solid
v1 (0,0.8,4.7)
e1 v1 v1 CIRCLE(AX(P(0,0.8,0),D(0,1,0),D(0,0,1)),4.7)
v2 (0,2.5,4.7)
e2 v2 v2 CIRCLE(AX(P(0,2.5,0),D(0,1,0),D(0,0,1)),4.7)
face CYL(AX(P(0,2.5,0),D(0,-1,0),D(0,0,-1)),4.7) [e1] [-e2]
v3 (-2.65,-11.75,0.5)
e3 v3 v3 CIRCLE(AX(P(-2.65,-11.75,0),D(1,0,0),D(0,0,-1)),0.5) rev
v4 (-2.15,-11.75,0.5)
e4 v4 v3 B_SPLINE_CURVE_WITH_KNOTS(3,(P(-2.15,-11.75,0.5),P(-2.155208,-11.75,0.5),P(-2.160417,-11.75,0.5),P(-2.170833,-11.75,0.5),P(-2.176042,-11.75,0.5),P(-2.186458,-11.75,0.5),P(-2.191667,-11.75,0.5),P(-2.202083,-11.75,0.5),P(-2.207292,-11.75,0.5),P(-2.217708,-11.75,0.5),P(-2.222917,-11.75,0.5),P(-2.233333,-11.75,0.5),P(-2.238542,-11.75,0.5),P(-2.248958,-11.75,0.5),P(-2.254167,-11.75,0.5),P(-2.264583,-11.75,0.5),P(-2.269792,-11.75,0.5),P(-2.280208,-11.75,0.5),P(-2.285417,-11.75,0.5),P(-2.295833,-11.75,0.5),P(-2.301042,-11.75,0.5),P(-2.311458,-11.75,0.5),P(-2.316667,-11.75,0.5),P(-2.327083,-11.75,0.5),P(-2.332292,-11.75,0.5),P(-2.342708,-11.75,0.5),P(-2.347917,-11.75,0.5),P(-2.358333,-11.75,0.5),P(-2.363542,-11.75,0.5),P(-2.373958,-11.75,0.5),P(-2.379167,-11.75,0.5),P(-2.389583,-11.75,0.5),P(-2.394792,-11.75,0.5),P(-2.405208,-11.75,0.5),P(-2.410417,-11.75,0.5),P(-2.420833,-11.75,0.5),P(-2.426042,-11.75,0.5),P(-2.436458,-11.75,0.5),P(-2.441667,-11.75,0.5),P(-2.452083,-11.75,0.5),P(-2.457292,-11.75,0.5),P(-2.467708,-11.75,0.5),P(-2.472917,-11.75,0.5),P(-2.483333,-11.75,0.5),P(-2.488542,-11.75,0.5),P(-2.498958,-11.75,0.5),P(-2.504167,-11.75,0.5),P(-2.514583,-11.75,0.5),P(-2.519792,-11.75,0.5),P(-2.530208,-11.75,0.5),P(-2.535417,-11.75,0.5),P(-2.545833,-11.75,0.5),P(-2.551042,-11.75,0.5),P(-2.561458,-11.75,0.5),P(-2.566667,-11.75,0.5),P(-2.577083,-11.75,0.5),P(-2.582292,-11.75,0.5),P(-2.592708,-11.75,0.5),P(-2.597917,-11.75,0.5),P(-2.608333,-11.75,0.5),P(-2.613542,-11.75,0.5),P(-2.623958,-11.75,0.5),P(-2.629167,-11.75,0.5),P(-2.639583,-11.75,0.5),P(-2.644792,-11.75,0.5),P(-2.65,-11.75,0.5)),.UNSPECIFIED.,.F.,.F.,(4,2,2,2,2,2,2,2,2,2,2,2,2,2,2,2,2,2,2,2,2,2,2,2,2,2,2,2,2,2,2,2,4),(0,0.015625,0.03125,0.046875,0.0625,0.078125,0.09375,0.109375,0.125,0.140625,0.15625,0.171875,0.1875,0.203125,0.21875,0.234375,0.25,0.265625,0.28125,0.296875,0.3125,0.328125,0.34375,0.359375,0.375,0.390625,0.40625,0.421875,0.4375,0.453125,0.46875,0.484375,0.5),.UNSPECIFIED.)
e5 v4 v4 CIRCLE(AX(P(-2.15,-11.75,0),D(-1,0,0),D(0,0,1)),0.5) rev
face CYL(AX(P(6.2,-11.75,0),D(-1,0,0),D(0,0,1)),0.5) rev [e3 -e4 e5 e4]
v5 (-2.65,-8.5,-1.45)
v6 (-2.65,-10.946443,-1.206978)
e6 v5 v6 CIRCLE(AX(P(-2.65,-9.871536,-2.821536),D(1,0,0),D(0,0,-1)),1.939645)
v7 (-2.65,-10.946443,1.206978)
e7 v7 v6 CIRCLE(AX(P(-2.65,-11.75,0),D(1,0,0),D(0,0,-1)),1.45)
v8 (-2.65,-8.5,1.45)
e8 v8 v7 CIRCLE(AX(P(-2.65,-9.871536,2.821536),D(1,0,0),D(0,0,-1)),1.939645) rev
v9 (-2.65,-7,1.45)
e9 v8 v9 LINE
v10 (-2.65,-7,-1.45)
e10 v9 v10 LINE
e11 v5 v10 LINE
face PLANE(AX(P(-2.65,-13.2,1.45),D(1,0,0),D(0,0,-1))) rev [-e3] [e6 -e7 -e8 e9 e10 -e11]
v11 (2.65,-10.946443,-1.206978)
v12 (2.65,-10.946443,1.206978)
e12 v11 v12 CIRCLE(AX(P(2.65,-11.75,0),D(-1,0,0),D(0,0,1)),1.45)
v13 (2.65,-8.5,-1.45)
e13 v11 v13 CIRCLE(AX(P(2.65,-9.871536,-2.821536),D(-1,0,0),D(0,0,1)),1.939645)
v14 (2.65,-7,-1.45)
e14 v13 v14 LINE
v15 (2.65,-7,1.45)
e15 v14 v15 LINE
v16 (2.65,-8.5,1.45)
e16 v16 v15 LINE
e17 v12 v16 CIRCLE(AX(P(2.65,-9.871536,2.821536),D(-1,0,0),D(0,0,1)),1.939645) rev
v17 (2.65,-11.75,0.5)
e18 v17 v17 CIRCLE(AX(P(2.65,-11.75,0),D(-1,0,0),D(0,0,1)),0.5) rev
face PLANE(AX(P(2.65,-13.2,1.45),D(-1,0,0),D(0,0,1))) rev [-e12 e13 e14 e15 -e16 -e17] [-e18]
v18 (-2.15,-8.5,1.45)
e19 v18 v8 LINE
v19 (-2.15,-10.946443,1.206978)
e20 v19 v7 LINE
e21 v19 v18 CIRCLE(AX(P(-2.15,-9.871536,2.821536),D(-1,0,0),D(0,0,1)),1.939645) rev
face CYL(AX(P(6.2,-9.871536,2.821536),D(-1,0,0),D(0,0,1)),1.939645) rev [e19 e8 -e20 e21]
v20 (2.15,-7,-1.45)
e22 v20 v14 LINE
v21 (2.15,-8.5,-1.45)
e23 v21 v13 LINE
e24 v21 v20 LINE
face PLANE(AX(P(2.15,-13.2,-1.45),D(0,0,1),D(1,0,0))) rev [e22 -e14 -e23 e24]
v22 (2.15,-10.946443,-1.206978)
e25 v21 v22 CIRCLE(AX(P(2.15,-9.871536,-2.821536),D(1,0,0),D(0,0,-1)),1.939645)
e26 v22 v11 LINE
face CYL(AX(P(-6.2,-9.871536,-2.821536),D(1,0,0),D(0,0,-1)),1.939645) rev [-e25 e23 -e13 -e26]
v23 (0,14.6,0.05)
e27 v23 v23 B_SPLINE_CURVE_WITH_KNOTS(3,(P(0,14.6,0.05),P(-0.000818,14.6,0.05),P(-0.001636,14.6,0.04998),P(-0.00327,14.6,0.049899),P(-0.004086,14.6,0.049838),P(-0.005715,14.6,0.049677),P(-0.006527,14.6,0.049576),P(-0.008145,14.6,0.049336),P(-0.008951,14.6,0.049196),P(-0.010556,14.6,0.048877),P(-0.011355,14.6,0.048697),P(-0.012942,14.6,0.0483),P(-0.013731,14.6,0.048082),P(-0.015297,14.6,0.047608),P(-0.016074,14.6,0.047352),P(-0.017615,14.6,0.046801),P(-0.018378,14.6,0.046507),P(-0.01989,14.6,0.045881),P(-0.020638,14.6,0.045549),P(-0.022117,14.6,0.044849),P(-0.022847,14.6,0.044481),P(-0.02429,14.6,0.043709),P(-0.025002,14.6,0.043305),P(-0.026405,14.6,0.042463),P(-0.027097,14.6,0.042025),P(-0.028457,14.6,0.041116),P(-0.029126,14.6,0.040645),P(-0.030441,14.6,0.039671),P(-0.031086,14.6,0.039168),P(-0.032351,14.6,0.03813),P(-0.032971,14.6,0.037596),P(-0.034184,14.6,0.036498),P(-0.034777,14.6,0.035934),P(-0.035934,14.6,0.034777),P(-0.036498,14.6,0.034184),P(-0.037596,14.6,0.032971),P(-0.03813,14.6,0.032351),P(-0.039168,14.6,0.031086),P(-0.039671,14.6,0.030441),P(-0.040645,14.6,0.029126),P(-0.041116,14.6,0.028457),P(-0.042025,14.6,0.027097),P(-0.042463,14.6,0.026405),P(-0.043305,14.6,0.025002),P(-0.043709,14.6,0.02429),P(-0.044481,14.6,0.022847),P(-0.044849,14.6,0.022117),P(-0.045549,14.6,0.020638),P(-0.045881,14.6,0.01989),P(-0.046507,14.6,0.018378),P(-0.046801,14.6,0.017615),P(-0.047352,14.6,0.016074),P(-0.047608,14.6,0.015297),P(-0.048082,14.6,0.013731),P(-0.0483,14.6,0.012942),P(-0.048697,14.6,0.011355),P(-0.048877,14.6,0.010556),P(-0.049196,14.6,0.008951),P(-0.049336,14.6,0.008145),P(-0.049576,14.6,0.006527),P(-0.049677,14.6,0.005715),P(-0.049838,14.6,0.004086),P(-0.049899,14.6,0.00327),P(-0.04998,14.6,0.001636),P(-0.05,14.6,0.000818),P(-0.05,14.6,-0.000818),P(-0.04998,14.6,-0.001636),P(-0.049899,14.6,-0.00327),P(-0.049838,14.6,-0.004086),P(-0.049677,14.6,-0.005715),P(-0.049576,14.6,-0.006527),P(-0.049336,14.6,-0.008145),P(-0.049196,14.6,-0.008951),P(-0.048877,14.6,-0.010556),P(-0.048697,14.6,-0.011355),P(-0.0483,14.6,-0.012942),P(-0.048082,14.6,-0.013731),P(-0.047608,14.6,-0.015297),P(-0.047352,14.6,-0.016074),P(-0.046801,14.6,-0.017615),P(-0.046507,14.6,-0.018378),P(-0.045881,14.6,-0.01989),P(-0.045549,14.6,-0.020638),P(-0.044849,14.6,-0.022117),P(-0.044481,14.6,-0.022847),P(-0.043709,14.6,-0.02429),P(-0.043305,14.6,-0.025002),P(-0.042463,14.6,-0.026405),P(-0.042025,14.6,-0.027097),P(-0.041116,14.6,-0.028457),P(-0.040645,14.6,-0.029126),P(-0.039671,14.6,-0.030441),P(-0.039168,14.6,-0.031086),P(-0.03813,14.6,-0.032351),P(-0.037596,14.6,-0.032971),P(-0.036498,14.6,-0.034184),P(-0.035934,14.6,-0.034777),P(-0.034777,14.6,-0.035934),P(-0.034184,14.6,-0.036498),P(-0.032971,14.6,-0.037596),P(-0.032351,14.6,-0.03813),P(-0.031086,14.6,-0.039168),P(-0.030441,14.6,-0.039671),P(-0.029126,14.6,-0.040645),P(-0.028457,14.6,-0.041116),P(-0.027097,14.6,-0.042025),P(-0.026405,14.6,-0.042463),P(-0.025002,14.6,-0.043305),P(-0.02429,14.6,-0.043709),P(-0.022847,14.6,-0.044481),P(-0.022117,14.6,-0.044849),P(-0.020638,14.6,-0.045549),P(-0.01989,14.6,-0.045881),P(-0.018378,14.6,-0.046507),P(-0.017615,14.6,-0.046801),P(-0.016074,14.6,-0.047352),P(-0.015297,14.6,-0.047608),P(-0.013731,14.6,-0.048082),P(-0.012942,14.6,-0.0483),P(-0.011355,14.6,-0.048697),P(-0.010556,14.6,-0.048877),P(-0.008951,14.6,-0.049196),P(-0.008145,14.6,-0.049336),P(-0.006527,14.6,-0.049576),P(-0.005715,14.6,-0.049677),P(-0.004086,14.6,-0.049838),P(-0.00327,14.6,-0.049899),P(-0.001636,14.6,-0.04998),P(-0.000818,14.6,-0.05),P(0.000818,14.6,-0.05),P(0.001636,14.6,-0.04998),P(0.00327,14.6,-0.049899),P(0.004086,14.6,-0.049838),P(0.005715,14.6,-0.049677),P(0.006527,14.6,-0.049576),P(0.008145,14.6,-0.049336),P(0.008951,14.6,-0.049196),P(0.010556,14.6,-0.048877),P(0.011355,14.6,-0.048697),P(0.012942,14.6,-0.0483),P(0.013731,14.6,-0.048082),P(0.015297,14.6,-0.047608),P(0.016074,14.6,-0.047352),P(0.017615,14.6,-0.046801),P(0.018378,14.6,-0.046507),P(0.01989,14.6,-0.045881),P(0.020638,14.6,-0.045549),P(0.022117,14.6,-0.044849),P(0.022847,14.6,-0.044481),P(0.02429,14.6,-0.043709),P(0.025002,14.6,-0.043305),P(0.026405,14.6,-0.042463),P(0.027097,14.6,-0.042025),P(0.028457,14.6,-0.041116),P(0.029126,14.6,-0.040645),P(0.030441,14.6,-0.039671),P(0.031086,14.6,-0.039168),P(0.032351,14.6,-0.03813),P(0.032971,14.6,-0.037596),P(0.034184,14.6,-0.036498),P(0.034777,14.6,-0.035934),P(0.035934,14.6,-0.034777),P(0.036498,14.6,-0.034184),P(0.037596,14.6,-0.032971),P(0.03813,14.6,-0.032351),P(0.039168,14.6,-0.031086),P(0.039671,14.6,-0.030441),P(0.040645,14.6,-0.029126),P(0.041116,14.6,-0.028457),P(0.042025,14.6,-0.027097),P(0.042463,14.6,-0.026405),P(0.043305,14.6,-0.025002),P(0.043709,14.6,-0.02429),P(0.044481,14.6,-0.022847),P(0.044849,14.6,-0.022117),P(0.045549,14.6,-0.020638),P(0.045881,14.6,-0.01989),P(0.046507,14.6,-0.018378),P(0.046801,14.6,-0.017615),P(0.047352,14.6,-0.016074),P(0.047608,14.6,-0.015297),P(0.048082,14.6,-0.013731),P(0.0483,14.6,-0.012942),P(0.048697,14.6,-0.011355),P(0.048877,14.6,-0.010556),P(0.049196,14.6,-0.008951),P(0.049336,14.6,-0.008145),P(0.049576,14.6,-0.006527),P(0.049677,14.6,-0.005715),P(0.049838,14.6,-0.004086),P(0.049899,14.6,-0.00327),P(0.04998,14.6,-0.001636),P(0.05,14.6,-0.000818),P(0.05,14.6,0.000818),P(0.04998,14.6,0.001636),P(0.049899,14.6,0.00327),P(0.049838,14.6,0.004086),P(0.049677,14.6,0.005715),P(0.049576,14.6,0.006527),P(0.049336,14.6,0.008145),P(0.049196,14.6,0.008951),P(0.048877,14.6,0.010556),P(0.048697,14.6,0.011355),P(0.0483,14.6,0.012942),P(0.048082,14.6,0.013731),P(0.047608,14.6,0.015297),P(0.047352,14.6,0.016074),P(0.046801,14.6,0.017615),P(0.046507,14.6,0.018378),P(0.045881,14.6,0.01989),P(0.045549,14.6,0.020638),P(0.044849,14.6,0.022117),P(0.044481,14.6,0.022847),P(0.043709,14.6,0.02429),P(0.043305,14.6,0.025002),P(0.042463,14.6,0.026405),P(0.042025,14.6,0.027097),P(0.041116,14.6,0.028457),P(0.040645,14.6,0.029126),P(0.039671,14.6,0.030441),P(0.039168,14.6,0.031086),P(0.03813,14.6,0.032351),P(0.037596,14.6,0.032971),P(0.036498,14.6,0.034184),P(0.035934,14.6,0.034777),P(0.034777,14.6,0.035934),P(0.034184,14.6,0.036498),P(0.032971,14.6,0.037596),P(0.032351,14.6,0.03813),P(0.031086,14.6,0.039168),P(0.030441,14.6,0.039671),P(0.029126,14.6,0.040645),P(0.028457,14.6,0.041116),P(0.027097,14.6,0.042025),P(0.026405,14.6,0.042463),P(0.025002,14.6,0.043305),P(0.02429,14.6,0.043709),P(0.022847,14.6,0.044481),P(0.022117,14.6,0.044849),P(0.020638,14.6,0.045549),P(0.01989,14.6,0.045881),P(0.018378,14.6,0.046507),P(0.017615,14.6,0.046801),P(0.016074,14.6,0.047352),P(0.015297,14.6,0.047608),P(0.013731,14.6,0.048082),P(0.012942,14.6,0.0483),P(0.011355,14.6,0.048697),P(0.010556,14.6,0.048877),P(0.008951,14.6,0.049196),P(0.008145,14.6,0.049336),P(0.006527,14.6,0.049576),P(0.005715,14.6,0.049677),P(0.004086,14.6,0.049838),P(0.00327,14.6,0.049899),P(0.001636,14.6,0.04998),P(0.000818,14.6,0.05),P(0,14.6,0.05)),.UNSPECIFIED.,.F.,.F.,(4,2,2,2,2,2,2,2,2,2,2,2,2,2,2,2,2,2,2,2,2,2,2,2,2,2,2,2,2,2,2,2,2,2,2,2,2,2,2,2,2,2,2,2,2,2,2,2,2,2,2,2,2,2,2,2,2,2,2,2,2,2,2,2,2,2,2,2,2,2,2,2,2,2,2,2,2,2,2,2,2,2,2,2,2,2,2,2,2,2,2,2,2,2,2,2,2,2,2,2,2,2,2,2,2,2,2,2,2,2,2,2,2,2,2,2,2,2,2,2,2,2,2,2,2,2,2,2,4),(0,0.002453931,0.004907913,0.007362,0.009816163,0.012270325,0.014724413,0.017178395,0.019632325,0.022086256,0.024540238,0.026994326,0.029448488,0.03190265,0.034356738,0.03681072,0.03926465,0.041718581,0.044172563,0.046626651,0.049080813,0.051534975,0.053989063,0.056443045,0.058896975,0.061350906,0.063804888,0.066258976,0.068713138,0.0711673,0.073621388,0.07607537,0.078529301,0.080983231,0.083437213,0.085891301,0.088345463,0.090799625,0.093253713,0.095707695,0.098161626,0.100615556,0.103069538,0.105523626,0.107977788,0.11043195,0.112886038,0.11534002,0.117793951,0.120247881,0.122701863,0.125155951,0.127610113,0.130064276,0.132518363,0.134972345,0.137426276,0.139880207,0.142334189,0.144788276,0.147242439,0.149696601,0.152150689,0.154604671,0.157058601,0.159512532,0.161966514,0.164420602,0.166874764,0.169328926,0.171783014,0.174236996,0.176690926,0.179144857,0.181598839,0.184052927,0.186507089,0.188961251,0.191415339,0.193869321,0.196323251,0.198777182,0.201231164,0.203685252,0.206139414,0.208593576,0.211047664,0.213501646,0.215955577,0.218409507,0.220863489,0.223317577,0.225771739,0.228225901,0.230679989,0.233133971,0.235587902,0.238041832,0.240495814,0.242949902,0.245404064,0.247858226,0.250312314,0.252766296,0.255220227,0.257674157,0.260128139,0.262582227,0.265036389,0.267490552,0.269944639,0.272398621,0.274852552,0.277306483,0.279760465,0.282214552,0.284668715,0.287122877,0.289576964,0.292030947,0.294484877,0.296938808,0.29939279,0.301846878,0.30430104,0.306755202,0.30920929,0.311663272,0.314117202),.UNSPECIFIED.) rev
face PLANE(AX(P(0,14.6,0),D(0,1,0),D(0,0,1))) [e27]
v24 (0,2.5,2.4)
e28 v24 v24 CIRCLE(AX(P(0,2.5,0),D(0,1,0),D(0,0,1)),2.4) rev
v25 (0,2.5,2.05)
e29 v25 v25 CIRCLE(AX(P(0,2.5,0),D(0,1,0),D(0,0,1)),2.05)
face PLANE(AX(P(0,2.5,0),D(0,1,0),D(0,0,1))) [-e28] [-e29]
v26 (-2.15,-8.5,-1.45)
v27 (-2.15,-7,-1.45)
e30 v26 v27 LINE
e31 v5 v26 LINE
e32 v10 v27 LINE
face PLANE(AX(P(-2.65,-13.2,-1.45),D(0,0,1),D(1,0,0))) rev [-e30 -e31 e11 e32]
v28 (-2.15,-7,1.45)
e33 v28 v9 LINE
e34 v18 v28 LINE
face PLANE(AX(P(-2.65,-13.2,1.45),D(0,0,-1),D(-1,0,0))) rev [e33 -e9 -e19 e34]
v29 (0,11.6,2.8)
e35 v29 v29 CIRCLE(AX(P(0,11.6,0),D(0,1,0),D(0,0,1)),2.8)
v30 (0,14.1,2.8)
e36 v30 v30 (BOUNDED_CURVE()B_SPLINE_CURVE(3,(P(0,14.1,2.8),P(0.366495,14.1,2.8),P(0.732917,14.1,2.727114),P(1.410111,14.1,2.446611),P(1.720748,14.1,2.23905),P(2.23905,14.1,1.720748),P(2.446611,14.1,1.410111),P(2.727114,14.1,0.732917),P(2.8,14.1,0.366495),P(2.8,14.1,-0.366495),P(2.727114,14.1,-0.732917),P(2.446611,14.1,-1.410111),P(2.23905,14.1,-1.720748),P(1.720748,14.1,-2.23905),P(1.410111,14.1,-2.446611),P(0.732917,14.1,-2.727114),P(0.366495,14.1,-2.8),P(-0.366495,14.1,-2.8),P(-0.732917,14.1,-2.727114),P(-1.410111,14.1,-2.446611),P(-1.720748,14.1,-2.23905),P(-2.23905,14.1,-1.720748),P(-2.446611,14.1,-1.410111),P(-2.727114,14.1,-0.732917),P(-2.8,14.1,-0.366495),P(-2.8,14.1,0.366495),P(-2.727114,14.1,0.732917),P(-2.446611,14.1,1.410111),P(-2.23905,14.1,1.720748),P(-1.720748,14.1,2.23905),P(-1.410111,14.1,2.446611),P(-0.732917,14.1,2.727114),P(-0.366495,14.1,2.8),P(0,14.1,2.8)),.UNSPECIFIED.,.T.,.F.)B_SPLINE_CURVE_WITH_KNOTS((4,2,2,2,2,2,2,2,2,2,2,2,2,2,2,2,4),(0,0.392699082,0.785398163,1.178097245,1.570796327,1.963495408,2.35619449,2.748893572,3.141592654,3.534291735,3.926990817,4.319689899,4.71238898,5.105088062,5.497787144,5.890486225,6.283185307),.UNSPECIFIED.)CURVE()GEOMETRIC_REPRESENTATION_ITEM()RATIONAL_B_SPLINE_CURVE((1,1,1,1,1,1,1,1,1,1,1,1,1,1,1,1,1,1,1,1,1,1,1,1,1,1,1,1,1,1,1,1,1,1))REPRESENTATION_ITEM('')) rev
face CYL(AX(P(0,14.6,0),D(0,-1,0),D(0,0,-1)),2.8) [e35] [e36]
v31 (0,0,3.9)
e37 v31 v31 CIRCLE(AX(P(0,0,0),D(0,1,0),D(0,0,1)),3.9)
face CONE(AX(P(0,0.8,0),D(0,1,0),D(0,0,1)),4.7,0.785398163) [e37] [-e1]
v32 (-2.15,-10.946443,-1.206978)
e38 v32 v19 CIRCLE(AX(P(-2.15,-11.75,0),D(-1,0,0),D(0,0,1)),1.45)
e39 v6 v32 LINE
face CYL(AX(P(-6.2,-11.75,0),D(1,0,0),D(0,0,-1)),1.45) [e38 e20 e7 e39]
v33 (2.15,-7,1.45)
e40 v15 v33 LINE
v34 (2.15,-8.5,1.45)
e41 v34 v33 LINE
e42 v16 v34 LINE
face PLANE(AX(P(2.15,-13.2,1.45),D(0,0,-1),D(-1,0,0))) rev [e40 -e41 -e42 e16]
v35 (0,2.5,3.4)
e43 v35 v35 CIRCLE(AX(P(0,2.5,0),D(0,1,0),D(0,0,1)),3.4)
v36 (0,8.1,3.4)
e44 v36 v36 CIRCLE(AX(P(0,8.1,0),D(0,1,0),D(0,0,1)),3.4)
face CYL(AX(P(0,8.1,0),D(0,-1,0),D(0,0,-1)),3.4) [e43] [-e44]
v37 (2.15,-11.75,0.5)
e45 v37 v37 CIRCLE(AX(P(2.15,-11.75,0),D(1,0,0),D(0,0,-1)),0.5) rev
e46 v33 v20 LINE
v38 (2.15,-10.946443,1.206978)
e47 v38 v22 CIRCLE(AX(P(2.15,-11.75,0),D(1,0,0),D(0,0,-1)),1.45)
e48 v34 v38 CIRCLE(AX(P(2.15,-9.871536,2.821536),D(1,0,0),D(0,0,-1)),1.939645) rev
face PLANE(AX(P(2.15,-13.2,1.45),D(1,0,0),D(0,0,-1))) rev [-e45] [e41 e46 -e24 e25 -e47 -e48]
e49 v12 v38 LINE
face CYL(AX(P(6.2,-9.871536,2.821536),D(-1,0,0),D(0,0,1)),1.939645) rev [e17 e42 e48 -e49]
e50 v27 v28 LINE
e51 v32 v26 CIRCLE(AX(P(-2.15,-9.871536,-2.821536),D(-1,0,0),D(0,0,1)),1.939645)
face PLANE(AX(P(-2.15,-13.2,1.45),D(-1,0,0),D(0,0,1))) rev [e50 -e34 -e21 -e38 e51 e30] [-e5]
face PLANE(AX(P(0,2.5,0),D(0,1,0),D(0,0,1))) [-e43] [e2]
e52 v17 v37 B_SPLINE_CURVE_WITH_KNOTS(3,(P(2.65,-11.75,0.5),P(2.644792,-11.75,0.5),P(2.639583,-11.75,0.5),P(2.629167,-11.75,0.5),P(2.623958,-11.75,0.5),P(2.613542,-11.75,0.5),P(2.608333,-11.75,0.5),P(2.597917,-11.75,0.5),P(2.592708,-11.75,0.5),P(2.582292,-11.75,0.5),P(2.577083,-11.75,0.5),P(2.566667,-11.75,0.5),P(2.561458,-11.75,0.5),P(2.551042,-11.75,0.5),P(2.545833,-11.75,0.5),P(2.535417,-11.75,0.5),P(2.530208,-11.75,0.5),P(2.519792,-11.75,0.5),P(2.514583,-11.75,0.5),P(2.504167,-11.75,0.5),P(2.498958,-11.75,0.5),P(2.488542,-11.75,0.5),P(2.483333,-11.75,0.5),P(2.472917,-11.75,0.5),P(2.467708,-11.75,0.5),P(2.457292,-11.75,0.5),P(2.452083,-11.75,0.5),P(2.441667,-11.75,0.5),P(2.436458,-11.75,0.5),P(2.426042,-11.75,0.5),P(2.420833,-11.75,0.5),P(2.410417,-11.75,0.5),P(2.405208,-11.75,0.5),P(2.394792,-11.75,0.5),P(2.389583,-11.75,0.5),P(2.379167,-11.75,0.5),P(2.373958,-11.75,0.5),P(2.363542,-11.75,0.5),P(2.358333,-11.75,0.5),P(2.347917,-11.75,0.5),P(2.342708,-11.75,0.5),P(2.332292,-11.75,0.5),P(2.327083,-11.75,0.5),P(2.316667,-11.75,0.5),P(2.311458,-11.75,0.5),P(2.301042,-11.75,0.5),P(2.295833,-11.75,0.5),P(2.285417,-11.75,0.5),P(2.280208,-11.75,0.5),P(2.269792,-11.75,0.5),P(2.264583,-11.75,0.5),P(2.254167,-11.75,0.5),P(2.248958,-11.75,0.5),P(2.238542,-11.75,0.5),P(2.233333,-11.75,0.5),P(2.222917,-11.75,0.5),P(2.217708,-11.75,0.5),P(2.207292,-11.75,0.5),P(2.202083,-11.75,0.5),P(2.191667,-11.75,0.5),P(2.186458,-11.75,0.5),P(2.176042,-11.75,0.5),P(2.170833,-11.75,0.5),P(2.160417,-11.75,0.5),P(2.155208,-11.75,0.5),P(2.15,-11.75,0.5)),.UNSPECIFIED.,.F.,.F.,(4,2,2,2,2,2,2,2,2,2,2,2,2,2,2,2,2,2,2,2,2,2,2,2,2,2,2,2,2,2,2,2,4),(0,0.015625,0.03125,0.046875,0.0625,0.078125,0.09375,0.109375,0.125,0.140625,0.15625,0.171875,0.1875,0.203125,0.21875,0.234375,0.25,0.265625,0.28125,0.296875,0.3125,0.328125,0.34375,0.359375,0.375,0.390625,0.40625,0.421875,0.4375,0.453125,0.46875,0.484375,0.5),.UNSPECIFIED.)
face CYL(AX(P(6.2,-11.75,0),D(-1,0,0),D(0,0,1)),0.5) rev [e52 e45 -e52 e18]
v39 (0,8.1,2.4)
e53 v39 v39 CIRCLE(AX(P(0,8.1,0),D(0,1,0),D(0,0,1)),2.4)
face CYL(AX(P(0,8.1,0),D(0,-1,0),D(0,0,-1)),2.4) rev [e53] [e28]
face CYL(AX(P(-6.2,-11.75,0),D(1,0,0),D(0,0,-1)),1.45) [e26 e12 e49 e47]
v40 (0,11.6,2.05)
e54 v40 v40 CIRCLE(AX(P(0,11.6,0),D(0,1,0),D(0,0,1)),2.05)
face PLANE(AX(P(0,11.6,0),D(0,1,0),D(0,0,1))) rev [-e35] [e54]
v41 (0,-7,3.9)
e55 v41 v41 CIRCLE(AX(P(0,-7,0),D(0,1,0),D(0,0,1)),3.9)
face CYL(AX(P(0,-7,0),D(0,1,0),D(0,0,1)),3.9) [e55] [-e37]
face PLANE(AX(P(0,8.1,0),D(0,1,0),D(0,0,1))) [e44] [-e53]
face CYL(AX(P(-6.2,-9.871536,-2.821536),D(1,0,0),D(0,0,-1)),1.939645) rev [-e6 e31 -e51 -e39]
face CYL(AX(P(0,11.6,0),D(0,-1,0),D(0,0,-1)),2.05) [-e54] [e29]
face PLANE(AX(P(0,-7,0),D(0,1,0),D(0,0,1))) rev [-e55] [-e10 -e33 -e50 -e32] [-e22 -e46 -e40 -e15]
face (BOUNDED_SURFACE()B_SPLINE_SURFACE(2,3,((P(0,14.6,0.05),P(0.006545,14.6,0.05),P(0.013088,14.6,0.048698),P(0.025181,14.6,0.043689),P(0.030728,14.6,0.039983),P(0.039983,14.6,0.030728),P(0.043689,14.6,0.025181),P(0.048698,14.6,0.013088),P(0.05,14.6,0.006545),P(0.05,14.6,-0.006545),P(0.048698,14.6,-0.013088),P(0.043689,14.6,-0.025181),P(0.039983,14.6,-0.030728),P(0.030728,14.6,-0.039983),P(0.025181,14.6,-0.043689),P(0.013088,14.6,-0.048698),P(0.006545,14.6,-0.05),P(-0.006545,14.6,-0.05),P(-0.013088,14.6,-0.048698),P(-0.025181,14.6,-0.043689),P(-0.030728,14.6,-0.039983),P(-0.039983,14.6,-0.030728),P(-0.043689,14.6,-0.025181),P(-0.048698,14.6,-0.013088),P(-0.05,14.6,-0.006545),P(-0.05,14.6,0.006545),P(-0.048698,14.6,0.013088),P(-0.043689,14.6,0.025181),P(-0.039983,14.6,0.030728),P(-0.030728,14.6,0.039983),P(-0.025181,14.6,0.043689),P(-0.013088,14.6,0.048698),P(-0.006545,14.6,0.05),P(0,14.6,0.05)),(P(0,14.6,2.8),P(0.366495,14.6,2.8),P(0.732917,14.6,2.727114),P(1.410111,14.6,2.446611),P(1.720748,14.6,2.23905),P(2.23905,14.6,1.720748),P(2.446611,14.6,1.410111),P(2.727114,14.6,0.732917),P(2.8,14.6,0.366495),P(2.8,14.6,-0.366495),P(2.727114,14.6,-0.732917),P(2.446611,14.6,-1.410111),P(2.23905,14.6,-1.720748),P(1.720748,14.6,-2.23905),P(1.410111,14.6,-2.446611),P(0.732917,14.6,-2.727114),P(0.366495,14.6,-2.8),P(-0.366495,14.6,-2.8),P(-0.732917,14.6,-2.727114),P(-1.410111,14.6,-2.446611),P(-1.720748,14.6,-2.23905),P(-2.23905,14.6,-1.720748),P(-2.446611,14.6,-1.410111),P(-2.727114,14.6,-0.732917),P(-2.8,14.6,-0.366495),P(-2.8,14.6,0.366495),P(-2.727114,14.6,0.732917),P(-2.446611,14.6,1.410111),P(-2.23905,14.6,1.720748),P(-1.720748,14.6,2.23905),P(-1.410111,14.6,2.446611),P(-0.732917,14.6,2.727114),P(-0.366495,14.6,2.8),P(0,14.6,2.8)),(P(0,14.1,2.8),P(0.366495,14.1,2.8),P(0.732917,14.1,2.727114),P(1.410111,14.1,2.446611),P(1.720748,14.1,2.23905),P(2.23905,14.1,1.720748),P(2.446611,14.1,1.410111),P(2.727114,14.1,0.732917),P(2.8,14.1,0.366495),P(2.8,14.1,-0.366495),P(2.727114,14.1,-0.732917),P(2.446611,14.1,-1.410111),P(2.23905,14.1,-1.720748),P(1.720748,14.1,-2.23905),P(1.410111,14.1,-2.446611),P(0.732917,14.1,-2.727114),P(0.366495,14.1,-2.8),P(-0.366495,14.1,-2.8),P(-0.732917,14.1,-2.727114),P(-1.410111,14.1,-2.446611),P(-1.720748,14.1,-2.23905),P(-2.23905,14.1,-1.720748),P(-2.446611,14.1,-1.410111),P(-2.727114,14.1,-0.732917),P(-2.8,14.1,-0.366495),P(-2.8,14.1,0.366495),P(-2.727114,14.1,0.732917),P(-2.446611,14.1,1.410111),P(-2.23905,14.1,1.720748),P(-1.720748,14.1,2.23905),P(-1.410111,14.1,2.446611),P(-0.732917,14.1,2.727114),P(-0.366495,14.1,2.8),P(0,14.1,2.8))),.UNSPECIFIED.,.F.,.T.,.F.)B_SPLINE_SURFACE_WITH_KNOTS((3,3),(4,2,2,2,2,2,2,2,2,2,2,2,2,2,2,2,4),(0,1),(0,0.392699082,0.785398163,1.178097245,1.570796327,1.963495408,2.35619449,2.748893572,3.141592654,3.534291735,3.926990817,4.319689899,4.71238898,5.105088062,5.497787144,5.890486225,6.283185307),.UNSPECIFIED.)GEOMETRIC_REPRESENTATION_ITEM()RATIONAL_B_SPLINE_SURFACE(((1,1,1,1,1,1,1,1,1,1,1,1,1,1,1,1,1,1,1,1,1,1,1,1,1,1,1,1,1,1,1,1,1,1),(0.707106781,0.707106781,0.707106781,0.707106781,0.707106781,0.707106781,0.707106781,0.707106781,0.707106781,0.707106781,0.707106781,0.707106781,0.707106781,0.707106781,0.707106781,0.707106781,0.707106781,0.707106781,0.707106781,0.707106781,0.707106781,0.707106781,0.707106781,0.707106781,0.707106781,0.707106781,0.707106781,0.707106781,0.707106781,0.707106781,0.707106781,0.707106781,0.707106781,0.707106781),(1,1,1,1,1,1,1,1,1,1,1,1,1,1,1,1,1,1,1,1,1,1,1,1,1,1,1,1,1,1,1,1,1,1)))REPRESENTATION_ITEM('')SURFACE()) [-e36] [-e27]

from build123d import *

# Parameters (mm, degrees)
SKETCH1_R               = 3.9
BOSS_EXTRUDE1_DEPTH     = 7
SKETCH2_R               = 4.7
BOSS_EXTRUDE2_DEPTH     = 2.5
CHAMFER1_SIZE           = 0.8
SKETCH3_R               = 3.4
SKETCH3_R_2             = 2.4
BOSS_EXTRUDE3_DEPTH     = 5.6
SKETCH4_R               = 2.05
BOSS_EXTRUDE4_DEPTH     = 9.1
SKETCH5_R               = 2.8
BOSS_EXTRUDE5_DEPTH     = 3
FILLET1_SIZE            = 0.5
FILLET1_SIZE_2          = 2.75
SKETCH6_W               = 0.5
SKETCH6_H               = 2.9
BOSS_EXTRUDE6_DEPTH     = 6.2
CUT_EXTRUDE1_DEPTH      = 6.2
CUT_EXTRUDE1_DEPTH_BACK = 6.2
SKETCH7_R               = 0.5


# Some blends are built 0.0001 mm under size
with BuildPart() as part:
    # Sketch1 → Boss-Extrude1 (new body)
    with BuildSketch(Plane(origin=(0, 0, 0), x_dir=(1, 0, 0), z_dir=(0, 1, 0))):
        with Locations(Location((0, 0, 0), (0, 0, 270))):
            Circle(SKETCH1_R)
    extrude(amount=-BOSS_EXTRUDE1_DEPTH)

    # Sketch2 → Boss-Extrude2 (add)
    with BuildSketch(Plane(origin=(0, 0, 0), x_dir=(1, 0, 0), z_dir=(0, 1, 0))):
        with Locations(Location((0, 0, 0), (0, 0, 270))):
            Circle(SKETCH2_R)
    extrude(amount=BOSS_EXTRUDE2_DEPTH)

    # Chamfer1
    chamfer1_edges = [part.edges().sort_by_distance(p)[0] for p in [
        (0, 0, -4.7),
    ]]
    chamfer(chamfer1_edges, length=CHAMFER1_SIZE - 0.0001)  # a hair under: the kernel refuses the full size

    # Sketch3 → Boss-Extrude3 (add)
    with BuildSketch(Plane(origin=(0, 2.5, 0), x_dir=(1, 0, 0), z_dir=(0, 1, 0))):
        with Locations(Location((0, 0, 0), (0, 0, 270))):
            Circle(SKETCH3_R)
        with Locations(Location((0, 0, 0), (0, 0, 270))):
            Circle(SKETCH3_R_2, mode=Mode.SUBTRACT)
    extrude(amount=BOSS_EXTRUDE3_DEPTH)

    # Sketch4 → Boss-Extrude4 (add)
    with BuildSketch(Plane(origin=(0, 2.5, 0), x_dir=(1, 0, 0), z_dir=(0, 1, 0))):
        with Locations(Location((0, 0, 0), (0, 0, 270))):
            Circle(SKETCH4_R)
    extrude(amount=BOSS_EXTRUDE4_DEPTH)

    # Sketch5 → Boss-Extrude5 (add)
    with BuildSketch(Plane(origin=(0, 11.6, 0), x_dir=(1, 0, 0), z_dir=(0, 1, 0))):
        with Locations(Location((0, 0, 0), (0, 0, 270))):
            Circle(SKETCH5_R)
    extrude(amount=BOSS_EXTRUDE5_DEPTH)

    # Fillet1
    # an asymmetric fillet: 2.75, 0.5 mm, written as the material it takes off along each edge
    with BuildSketch(Plane(origin=(0, 14.6, 0), x_dir=(0, 0, 1), z_dir=(-1, 0, 0))) as fillet1_piece_1:
        with BuildLine():
            Bezier((2.8, -FILLET1_SIZE), (2.8, 0), (2.8 - FILLET1_SIZE_2, 0), weights=[1, 0.707106781, 1])
            Line((2.8 - FILLET1_SIZE_2, 0), (2.8, 0))
            Line((2.8, 0), (2.8, -FILLET1_SIZE))
        make_face()
    revolve(axis=Axis((0, 14.6, 0), (0, 1, 0)), mode=Mode.SUBTRACT)

    # Sketch6 → Boss-Extrude6 (add)
    with BuildSketch(Plane.XZ.offset(7)):
        with Locations((-2.4, 0)):
            Rectangle(SKETCH6_W, SKETCH6_H)
        with Locations((2.4, 0)):
            Rectangle(SKETCH6_W, SKETCH6_H)
    extrude(amount=BOSS_EXTRUDE6_DEPTH)

    # Sketch7 → Cut-Extrude1 (cut, two sides: drawn at the far end of the back side and taken through both)
    with BuildSketch(Plane(origin=(0, 0, 0), x_dir=(0, 0, -1), z_dir=(1, 0, 0)).offset(-CUT_EXTRUDE1_DEPTH_BACK)):
        with BuildLine():
            ThreePointArc((-1.206978138, -10.946443049), (-0.891390932, -9.679801587), (-1.45, -8.5))
            Line((-1.45, -8.5), (-1.45, -11.75))
            ThreePointArc((-1.45, -11.75), (-1.387915397, -11.330249062), (-1.206978138, -10.946443049))
        make_face()
        with BuildLine():
            ThreePointArc((1.45, -11.749999997), (1.025304834, -12.775304832), (0, -13.2))
            Line((0, -13.2), (1.45, -13.2))
            Line((1.45, -13.2), (1.45, -11.749999997))
        make_face()
        with BuildLine():
            ThreePointArc((0, -13.2), (-1.025304833, -12.775304833), (-1.45, -11.75))
            Line((-1.45, -11.75), (-1.45, -13.2))
            Line((-1.45, -13.2), (0, -13.2))
        make_face()
        with BuildLine():
            ThreePointArc((1.206978138, -10.946443049), (1.387915397, -11.330249061), (1.45, -11.749999997))
            Line((1.45, -11.749999997), (1.45, -8.5))
            ThreePointArc((1.45, -8.5), (0.891390932, -9.679801587), (1.206978138, -10.946443049))
        make_face()
        with Locations(Location((0, -11.75, 0), (0, 0, 180))):
            Circle(SKETCH7_R)
    extrude(amount=CUT_EXTRUDE1_DEPTH + CUT_EXTRUDE1_DEPTH_BACK, mode=Mode.SUBTRACT)


solid = part.part
